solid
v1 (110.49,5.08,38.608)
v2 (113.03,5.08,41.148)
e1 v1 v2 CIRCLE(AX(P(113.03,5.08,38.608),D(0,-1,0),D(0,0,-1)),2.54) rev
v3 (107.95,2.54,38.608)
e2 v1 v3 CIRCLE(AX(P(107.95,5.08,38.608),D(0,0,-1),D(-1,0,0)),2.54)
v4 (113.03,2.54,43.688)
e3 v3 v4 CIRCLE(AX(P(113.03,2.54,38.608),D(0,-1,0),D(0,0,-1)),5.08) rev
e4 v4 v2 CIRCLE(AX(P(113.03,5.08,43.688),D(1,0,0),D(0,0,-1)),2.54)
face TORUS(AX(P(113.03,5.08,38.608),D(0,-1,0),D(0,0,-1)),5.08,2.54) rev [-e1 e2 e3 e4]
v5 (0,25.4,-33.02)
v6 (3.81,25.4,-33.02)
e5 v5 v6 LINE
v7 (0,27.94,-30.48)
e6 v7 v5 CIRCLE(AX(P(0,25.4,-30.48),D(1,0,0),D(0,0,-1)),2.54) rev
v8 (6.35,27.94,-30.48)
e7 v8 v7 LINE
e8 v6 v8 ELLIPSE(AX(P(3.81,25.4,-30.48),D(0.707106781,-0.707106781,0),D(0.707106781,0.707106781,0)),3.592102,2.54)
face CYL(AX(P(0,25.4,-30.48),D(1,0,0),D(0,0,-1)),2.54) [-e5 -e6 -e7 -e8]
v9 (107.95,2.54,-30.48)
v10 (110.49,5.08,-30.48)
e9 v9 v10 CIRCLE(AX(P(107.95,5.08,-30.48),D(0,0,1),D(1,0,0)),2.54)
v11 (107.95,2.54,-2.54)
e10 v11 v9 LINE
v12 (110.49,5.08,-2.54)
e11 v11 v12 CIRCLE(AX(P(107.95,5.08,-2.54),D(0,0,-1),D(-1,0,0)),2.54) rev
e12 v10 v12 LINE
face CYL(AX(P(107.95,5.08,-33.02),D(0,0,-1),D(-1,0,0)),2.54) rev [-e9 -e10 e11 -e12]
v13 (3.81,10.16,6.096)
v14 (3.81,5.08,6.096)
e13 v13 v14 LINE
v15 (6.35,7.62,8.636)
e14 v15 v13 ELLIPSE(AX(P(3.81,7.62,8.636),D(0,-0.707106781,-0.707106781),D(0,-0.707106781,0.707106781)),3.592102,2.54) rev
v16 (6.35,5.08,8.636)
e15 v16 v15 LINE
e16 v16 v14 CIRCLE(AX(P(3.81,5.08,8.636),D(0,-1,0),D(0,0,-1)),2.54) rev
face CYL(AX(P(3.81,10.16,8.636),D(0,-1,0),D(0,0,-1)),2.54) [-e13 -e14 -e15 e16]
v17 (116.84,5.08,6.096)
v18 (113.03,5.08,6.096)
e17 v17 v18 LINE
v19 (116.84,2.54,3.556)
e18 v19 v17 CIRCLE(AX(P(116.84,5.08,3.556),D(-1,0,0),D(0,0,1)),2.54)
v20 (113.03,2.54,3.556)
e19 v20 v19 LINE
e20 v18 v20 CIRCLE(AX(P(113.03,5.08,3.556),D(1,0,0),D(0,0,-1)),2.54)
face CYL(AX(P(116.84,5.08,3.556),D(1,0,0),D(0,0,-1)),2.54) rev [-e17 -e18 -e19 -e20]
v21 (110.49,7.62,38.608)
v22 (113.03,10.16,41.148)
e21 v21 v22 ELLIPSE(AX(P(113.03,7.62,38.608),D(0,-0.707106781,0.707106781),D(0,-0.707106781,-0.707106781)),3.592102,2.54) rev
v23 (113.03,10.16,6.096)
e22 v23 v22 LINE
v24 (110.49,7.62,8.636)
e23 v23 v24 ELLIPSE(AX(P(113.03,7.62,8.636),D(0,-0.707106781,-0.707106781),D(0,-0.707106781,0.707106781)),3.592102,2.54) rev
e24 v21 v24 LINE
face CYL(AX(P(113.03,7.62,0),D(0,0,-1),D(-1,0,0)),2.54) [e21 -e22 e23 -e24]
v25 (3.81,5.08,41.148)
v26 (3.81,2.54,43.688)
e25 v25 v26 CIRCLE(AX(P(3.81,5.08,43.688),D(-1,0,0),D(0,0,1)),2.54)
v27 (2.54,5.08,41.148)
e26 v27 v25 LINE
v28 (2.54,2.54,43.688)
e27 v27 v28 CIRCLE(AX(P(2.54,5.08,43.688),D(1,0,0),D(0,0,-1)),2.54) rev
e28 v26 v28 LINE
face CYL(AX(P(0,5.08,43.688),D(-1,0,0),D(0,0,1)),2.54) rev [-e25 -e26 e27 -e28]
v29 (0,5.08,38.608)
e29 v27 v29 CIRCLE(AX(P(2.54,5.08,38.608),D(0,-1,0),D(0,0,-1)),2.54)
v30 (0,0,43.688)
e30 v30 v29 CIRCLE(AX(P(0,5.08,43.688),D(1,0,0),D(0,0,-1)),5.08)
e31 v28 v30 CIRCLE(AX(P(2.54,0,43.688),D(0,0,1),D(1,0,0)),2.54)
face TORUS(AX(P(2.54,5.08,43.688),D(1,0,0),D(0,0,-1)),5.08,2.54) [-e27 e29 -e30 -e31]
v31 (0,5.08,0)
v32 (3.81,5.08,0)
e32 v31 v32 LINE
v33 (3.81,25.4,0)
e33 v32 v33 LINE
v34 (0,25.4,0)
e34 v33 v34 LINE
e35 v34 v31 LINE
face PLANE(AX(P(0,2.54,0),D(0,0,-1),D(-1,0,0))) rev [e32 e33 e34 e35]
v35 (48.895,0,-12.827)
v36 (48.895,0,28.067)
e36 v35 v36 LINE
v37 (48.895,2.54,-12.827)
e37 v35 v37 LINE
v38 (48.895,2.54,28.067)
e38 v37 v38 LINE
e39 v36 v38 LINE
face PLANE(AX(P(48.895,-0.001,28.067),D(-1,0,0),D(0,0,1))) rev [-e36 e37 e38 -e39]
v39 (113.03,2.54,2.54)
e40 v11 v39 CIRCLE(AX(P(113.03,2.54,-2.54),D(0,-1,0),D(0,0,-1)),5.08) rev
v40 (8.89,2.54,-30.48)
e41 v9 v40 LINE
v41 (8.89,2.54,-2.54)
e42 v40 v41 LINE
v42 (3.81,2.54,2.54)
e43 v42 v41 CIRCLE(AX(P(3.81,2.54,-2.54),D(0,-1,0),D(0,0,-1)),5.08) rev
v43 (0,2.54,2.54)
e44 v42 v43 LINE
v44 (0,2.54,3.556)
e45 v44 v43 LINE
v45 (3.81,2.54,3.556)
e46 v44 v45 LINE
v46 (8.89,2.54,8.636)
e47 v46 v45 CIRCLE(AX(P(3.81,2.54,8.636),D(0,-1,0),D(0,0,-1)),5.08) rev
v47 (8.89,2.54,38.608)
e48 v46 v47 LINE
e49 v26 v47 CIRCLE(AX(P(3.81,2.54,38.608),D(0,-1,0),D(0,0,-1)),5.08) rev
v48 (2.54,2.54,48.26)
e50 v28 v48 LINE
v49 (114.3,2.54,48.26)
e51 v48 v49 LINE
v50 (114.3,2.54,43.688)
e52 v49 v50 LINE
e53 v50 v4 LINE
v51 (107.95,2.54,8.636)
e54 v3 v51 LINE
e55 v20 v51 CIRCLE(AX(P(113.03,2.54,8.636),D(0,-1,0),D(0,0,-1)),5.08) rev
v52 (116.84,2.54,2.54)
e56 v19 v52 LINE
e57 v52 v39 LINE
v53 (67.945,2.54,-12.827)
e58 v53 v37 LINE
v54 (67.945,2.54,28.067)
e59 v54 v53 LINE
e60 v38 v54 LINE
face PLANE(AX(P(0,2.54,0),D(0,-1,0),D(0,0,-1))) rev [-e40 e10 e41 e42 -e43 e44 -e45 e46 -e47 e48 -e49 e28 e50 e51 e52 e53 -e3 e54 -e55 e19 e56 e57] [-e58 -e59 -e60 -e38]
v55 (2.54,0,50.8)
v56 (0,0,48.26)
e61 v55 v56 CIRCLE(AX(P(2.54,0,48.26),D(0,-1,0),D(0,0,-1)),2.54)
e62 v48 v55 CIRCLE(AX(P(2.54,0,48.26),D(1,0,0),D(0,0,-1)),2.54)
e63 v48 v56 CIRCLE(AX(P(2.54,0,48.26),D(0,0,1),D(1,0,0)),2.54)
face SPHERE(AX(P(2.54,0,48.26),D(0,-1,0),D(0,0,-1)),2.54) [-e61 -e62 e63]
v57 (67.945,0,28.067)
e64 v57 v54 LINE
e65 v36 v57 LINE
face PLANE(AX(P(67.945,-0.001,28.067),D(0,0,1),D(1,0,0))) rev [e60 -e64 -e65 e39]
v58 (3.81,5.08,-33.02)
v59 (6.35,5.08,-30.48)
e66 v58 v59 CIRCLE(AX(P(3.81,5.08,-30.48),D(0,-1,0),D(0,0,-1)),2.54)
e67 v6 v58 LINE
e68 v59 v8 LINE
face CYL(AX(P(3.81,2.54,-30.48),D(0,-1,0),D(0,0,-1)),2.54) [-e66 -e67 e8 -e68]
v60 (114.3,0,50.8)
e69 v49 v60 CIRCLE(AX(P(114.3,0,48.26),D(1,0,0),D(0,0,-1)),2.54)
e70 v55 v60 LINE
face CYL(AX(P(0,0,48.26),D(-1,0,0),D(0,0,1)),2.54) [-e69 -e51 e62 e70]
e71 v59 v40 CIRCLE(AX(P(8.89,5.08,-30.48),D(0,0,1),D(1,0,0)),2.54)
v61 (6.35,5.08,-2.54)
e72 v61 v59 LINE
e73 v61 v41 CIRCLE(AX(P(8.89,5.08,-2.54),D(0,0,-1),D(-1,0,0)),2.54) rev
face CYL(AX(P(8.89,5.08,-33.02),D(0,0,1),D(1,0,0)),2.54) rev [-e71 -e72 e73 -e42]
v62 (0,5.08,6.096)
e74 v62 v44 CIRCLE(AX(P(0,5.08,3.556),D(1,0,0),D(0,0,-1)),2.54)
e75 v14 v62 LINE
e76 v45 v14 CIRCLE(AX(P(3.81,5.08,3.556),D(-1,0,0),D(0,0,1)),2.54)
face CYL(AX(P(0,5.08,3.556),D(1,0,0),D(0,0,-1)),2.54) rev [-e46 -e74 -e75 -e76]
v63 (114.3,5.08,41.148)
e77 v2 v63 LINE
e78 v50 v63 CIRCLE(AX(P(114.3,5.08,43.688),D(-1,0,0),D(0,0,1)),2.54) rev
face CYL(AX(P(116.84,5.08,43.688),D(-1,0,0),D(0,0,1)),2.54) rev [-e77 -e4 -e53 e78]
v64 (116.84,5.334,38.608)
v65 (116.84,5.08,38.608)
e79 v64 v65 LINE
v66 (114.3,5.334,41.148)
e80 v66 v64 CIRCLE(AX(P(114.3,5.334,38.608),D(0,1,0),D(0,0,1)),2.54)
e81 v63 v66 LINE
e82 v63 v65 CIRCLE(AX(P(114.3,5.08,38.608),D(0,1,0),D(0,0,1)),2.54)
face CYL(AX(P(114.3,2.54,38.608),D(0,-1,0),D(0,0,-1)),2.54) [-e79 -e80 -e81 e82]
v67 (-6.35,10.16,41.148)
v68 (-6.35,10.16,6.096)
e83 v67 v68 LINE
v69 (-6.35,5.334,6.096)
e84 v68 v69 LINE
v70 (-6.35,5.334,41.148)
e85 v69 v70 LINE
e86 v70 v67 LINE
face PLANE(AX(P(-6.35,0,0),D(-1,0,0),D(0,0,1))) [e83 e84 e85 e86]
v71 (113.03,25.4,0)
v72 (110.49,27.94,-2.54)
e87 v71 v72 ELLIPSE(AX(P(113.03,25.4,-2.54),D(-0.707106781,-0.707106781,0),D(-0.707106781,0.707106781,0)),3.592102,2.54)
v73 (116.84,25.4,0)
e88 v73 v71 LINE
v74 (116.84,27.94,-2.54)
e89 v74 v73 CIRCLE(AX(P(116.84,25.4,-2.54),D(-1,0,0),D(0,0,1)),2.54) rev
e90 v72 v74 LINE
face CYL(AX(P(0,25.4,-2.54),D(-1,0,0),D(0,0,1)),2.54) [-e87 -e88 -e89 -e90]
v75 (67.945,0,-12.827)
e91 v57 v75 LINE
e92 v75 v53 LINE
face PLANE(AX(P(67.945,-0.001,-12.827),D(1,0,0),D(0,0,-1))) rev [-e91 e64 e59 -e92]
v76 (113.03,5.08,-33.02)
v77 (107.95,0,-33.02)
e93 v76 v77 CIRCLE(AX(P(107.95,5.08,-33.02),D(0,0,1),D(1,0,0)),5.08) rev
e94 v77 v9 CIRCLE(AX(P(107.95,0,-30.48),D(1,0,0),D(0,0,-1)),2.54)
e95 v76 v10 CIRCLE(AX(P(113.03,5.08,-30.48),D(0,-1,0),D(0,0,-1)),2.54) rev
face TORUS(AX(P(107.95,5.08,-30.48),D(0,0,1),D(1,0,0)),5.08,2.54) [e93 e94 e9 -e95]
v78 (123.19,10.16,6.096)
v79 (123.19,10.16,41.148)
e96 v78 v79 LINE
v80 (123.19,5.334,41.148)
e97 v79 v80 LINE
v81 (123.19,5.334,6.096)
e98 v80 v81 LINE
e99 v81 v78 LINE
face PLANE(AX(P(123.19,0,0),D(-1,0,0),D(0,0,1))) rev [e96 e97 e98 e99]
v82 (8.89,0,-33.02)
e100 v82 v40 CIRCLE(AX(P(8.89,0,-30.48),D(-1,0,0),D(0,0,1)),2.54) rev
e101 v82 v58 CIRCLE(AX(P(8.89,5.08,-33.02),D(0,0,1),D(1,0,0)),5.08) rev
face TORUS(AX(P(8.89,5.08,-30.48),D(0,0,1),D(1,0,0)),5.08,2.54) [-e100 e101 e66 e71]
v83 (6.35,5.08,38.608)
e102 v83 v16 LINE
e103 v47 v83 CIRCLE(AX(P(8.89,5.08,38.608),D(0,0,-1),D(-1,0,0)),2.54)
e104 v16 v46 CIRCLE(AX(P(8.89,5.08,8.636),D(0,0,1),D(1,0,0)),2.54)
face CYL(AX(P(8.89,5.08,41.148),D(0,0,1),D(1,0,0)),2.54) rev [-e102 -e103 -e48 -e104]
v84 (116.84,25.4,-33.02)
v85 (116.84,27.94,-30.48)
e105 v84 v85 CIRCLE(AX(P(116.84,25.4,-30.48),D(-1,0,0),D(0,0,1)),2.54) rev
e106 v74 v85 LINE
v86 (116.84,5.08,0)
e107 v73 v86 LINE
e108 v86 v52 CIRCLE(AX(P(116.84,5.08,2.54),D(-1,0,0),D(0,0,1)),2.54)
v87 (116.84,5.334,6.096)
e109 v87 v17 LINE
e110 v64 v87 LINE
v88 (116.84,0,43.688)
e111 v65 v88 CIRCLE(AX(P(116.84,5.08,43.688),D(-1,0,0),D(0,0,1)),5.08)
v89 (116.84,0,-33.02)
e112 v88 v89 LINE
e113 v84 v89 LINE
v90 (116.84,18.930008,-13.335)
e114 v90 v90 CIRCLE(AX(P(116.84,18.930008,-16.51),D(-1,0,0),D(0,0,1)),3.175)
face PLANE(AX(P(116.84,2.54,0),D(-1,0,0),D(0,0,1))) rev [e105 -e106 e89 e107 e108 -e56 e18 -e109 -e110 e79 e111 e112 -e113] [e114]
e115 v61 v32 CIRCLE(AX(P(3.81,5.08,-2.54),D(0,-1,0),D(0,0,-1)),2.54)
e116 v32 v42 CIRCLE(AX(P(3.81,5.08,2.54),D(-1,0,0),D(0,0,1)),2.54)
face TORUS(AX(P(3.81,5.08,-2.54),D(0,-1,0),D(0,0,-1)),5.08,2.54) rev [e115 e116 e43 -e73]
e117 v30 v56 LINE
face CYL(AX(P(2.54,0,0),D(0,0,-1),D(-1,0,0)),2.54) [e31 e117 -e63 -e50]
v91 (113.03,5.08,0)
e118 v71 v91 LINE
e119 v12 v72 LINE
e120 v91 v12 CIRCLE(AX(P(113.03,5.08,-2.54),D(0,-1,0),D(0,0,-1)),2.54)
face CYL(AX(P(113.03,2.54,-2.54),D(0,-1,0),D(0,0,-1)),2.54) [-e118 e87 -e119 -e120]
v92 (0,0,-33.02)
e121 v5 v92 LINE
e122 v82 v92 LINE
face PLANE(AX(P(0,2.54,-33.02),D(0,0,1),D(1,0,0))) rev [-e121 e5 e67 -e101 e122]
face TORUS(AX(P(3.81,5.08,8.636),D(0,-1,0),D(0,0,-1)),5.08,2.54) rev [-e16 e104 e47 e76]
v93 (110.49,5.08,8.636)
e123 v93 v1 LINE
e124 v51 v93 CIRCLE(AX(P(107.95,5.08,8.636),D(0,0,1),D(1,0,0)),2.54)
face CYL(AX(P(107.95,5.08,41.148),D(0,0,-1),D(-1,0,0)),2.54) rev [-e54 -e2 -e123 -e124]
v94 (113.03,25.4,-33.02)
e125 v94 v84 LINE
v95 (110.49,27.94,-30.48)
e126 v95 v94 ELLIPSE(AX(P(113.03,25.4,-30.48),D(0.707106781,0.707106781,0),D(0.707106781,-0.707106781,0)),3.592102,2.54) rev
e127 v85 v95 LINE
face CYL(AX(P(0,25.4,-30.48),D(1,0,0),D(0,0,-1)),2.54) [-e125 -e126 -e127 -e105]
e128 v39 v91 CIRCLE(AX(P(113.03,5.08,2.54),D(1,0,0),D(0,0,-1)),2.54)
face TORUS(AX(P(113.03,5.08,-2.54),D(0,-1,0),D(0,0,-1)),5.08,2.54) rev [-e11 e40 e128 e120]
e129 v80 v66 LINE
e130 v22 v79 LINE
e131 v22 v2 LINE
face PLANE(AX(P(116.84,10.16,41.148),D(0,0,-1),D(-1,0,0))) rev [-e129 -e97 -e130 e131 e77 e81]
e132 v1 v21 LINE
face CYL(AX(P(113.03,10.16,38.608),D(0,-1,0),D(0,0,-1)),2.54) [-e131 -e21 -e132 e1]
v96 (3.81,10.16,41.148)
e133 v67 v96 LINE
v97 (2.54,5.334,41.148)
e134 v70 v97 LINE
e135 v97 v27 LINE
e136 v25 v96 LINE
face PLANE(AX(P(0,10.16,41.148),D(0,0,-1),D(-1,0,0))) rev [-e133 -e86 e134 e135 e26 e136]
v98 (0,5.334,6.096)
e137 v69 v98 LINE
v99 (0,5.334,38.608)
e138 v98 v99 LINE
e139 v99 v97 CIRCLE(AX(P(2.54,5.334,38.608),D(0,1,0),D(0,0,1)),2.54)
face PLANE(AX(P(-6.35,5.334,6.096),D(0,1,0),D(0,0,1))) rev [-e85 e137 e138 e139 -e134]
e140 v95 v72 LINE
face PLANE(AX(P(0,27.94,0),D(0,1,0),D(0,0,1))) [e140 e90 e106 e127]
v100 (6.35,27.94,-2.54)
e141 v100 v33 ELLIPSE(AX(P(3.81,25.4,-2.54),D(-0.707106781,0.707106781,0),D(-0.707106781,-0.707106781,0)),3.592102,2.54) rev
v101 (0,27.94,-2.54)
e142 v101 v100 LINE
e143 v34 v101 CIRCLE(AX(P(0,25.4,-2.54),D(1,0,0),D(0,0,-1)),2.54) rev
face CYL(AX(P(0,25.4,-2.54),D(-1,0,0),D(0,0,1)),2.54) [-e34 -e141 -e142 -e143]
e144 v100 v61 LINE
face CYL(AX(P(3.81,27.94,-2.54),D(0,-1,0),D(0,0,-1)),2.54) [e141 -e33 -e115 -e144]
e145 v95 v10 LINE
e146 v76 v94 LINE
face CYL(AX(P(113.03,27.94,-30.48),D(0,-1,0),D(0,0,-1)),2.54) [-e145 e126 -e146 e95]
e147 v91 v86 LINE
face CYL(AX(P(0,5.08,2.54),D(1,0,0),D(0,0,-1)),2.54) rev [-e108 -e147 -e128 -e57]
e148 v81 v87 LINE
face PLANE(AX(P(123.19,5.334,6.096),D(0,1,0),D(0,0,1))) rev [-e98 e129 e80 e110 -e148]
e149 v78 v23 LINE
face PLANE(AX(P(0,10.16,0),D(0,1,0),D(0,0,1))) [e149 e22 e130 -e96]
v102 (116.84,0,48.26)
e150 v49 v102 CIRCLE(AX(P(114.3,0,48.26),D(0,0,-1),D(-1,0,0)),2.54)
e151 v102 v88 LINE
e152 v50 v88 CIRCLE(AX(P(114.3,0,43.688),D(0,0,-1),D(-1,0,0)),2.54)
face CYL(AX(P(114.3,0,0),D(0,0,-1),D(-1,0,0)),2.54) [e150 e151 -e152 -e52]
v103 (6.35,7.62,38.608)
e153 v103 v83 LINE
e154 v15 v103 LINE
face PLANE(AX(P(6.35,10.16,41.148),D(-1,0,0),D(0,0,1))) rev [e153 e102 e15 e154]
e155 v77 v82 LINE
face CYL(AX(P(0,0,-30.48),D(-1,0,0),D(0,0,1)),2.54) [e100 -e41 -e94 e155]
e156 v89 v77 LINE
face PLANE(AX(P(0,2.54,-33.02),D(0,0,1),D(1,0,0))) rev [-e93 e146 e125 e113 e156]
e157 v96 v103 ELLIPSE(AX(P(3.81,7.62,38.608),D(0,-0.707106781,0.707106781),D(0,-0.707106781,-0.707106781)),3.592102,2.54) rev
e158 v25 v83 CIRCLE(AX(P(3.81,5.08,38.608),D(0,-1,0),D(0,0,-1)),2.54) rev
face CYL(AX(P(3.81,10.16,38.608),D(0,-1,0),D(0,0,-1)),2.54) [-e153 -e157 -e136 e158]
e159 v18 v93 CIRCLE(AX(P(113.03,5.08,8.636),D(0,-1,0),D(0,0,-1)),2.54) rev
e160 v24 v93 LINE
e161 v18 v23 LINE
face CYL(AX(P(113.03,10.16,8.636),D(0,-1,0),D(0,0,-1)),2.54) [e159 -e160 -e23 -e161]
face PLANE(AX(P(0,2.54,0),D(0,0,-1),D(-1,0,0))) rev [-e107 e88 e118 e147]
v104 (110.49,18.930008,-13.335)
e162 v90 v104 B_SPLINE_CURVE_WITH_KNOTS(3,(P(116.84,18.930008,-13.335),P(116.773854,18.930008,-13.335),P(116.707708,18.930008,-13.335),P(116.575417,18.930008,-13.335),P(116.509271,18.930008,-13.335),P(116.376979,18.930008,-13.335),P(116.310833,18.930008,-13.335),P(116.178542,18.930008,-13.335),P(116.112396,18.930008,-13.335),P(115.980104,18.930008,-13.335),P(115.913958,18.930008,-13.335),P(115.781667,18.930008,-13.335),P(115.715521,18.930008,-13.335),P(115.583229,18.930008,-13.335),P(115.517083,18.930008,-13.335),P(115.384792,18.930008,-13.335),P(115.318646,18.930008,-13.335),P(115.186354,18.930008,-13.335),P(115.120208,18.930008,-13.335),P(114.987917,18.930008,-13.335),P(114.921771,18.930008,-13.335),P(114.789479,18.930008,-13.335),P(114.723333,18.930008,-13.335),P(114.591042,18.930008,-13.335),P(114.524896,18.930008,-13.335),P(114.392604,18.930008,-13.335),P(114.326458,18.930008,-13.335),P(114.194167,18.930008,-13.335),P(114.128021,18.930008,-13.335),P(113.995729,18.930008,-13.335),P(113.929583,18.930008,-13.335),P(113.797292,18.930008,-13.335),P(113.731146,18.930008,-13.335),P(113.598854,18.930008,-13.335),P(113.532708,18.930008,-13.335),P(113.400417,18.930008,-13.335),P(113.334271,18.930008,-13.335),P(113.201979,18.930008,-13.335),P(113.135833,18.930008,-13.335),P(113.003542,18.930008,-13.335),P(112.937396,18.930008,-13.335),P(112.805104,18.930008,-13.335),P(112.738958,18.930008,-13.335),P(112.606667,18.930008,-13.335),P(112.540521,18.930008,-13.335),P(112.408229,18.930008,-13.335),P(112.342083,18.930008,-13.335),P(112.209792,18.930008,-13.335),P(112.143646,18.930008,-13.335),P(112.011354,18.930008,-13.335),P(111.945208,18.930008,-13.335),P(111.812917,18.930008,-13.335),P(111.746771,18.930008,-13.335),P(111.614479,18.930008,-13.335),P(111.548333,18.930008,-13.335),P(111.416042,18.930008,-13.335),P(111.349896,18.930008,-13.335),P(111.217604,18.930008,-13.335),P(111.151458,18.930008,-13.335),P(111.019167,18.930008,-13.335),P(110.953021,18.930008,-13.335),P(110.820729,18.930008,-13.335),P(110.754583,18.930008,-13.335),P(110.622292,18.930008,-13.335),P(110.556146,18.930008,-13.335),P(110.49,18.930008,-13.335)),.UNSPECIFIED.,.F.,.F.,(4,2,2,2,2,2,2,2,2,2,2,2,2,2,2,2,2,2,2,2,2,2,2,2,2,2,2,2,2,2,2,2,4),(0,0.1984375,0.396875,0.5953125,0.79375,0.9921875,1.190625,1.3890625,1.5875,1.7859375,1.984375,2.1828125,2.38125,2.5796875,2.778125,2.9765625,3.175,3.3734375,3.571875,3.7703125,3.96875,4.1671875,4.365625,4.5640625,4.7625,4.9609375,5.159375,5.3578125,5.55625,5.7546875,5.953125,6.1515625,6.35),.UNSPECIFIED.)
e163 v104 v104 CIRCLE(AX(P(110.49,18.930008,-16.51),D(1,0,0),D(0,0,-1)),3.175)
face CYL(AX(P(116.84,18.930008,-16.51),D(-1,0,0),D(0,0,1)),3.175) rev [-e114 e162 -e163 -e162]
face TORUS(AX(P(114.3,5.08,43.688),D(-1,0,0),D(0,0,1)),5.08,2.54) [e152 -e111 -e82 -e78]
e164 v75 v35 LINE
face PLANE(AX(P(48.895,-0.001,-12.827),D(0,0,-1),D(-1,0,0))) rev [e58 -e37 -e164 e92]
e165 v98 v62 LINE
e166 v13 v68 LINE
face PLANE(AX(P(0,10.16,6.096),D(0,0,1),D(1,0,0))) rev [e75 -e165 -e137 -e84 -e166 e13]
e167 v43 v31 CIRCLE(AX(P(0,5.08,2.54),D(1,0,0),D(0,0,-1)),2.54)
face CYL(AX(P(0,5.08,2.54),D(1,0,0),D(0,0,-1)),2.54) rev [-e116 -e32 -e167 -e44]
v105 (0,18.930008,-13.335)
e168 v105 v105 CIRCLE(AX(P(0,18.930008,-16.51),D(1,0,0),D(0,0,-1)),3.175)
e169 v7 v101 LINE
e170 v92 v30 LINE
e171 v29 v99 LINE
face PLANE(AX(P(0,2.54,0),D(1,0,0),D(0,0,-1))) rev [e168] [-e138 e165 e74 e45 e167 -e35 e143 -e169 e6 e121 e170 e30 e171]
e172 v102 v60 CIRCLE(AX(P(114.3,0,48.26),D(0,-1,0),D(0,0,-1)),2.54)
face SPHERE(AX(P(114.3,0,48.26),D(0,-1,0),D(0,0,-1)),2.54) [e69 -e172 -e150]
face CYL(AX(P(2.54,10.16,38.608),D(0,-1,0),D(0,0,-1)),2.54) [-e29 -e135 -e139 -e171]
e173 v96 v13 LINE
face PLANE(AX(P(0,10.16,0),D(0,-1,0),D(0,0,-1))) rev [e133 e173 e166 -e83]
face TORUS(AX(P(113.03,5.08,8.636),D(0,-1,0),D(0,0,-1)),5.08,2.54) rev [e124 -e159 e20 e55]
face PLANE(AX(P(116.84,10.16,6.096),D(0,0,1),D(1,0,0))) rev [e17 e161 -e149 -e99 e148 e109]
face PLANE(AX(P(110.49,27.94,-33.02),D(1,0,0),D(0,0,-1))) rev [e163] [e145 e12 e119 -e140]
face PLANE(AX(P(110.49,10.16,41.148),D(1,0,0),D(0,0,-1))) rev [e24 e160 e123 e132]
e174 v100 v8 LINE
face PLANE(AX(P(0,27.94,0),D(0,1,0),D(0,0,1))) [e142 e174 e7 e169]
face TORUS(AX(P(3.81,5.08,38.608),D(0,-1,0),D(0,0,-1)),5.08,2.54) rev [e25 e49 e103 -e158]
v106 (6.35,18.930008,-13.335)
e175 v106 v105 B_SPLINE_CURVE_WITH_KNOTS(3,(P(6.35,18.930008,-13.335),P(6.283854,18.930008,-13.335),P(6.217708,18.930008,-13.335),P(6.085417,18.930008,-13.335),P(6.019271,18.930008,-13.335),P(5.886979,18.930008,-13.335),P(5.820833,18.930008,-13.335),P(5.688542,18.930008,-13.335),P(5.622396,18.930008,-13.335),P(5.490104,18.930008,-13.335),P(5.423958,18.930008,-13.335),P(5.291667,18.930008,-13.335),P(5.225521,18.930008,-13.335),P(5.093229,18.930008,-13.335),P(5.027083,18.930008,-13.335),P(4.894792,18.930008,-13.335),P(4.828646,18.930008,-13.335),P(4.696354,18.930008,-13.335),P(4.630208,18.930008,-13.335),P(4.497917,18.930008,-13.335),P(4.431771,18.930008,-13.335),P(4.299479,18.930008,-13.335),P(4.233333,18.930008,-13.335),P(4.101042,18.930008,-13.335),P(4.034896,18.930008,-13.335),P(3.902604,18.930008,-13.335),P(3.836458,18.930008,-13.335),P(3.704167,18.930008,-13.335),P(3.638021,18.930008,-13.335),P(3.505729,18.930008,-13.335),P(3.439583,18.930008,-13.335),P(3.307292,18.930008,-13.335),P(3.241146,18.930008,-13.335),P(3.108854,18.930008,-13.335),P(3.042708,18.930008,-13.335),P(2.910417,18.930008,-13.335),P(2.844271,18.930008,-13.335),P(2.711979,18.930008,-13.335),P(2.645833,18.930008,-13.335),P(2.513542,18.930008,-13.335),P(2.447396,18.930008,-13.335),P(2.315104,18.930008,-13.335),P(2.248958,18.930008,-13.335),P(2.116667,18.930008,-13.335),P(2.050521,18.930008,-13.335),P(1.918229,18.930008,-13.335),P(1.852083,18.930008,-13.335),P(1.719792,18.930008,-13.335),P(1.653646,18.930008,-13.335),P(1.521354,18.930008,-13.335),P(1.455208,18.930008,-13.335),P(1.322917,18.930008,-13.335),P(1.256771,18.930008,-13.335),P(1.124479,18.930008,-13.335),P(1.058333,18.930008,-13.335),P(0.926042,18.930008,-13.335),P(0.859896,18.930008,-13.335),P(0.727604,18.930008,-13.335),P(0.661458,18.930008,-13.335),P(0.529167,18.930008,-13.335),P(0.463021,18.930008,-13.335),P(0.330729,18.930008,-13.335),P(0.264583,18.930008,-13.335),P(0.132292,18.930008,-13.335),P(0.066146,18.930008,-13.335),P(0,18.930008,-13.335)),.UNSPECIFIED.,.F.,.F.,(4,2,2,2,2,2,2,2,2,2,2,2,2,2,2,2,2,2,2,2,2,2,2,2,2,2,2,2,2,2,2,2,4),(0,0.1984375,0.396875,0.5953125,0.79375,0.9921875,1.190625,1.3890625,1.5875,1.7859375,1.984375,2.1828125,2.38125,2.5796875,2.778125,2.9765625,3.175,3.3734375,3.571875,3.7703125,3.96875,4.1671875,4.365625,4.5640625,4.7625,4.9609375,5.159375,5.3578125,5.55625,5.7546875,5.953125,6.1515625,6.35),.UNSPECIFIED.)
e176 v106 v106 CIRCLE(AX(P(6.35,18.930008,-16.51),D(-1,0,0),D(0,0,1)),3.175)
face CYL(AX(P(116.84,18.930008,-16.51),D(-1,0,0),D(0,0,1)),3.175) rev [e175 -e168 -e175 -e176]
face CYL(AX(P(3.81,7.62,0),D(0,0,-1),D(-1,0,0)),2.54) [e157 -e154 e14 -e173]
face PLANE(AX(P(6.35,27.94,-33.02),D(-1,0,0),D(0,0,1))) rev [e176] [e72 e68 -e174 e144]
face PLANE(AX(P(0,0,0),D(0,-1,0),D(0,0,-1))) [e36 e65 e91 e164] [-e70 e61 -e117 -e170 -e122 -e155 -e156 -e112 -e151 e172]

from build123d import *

# Parameters (mm, degrees)
SKETCH2_W               = 116.84
SKETCH2_H               = 33.02
BOSS_EXTRUDE1_DEPTH     = 2.54
SKETCH3_W               = 6.35
SKETCH3_H               = 33.02
BOSS_EXTRUDE2_DEPTH     = 25.4
CUT_EXTRUDE1_DEPTH      = 125.589524439
CUT_EXTRUDE1_DEPTH_BACK = 125.589524439
SKETCH4_R               = 3.175
SKETCH5_W               = 116.84
SKETCH5_H               = 2.54
BOSS_EXTRUDE3_DEPTH     = 50.8
SKETCH6_W               = 6.35
SKETCH6_H               = 35.052
BOSS_EXTRUDE4_DEPTH     = 7.62
SKETCH7_W               = 35.052
SKETCH7_H               = 4.826
BOSS_EXTRUDE5_DEPTH     = 6.35
SKETCH8_W               = 35.052
SKETCH8_H               = 4.826
BOSS_EXTRUDE6_DEPTH     = 6.35
FILLET1_R               = 2.54
FILLET7_R               = 2.54
FILLET8_R               = 2.54
CUT_EXTRUDE2_REACH      = 137.652
SKETCH16_W              = 19.05
SKETCH16_H              = 40.894


with BuildPart() as part:
    # Sketch2 → Boss-Extrude1 (new body)
    with BuildSketch(Plane(origin=(0, 0, 0), x_dir=(1, 0, 0), z_dir=(0, 1, 0))):
        with Locations((58.42, 16.51)):
            Rectangle(SKETCH2_W, SKETCH2_H)
    extrude(amount=BOSS_EXTRUDE1_DEPTH)

    # Sketch3 → Boss-Extrude2 (add)
    with BuildSketch(Plane(origin=(0, 2.54, 0), x_dir=(1, 0, 0), z_dir=(0, 1, 0))):
        with Locations((3.175, 16.51)):
            Rectangle(SKETCH3_W, SKETCH3_H)
        with Locations((113.665, 16.51)):
            Rectangle(SKETCH3_W, SKETCH3_H)
    extrude(amount=BOSS_EXTRUDE2_DEPTH)

    # Sketch4 → Cut-Extrude1 (cut, two sides: drawn at the far end of the back side and taken through both)
    with BuildSketch(Plane.ZY.offset(-CUT_EXTRUDE1_DEPTH_BACK)):
        with Locations((-16.51, 18.93000799)):
            Circle(SKETCH4_R)
    extrude(amount=CUT_EXTRUDE1_DEPTH + CUT_EXTRUDE1_DEPTH_BACK, mode=Mode.SUBTRACT)

    # Sketch5 → Boss-Extrude3 (add)
    with BuildSketch(Plane.XY):
        with Locations((58.42, 1.27)):
            Rectangle(SKETCH5_W, SKETCH5_H)
    extrude(amount=BOSS_EXTRUDE3_DEPTH)

    # Sketch6 → Boss-Extrude4 (add)
    with BuildSketch(Plane(origin=(0, 2.54, 0), x_dir=(1, 0, 0), z_dir=(0, 1, 0))):
        with Locations((3.175, -23.622)):
            Rectangle(SKETCH6_W, SKETCH6_H)
        with Locations((113.665, -23.622)):
            Rectangle(SKETCH6_W, SKETCH6_H)
    extrude(amount=BOSS_EXTRUDE4_DEPTH)

    # Sketch7 → Boss-Extrude5 (add)
    with BuildSketch(Plane.ZY):
        with Locations((23.622, 7.747)):
            Rectangle(SKETCH7_W, SKETCH7_H)
    extrude(amount=BOSS_EXTRUDE5_DEPTH)

    # Sketch8 → Boss-Extrude6 (add)
    with BuildSketch(Plane(origin=(116.84, 0, 0), x_dir=(0, 0, -1), z_dir=(1, 0, 0))):
        with Locations((-23.622, 7.747)):
            Rectangle(SKETCH8_W, SKETCH8_H)
    extrude(amount=BOSS_EXTRUDE6_DEPTH)

    # Fillet1
    fillet1_edges = [part.edges().sort_by_distance(p)[0] for p in [
        (6.35, 2.54, -16.51),
        (6.35, 15.24, 0),
        (6.35, 15.24, -33.02),
        (3.175, 27.94, 0),
        (3.175, 27.94, -33.02),
        (58.42, 2.54, -33.02),
        (110.49, 2.54, -16.51),
        (110.49, 15.24, -33.02),
        (110.49, 15.24, 0),
        (113.665, 27.94, 0),
        (113.665, 27.94, -33.02),
        (3.175, 2.54, 0),
        (113.665, 2.54, 0),
        (3.175, 2.54, 41.148),
        (6.35, 2.54, 23.622),
        (6.35, 6.35, 41.148),
        (3.175, 2.54, 6.096),
        (6.35, 6.35, 6.096),
        (6.35, 10.16, 23.622),
        (113.665, 2.54, 6.096),
        (110.49, 2.54, 23.622),
        (110.49, 6.35, 6.096),
        (113.665, 2.54, 41.148),
        (110.49, 6.35, 41.148),
        (110.49, 10.16, 23.622),
    ]]
    fillet(fillet1_edges, radius=FILLET1_R - 0.0001)  # a hair under: the kernel refuses the full size

    # Fillet7
    fillet7_edges = [part.edges().sort_by_distance(p)[0] for p in [
        (0, 1.27, 50.8),
        (116.84, 1.27, 50.8),
    ]]
    fillet(fillet7_edges, radius=FILLET7_R)

    # Fillet8
    fillet8_edges = [part.edges().sort_by_distance(p)[0] for p in [
        (116.84, 5.20695, 41.148),
        (116.84, 3.283919486, 41.891919486),
        (116.84, 2.54, 45.97395),
        (116.096051224, 2.54, 50.056051224),
        (0, 5.20695, 41.148),
        (0, 3.283919486, 41.891919486),
        (0, 2.54, 45.97395),
        (0.743948776, 2.54, 50.056051224),
        (58.42, 2.54, 50.8),
    ]]
    fillet(fillet8_edges, radius=FILLET8_R - 0.0001)  # a hair under: the kernel refuses the full size

    # Sketch16 → Cut-Extrude2 (cut, up to next)
    with BuildSketch(Plane(origin=(0, 2.54, 0), x_dir=(1, 0, 0), z_dir=(0, 1, 0)), mode=Mode.PRIVATE) as cut_extrude2_sk1:
        with Locations((58.42, -7.62)):
            Rectangle(SKETCH16_W, SKETCH16_H)
    cut_extrude2_tool1 = extrude(cut_extrude2_sk1.sketch, amount=-CUT_EXTRUDE2_REACH, mode=Mode.PRIVATE) & part.part
    add(cut_extrude2_tool1.solids().sort_by_distance((58.42, 2.54, 7.62))[0], mode=Mode.SUBTRACT)


solid = part.part
